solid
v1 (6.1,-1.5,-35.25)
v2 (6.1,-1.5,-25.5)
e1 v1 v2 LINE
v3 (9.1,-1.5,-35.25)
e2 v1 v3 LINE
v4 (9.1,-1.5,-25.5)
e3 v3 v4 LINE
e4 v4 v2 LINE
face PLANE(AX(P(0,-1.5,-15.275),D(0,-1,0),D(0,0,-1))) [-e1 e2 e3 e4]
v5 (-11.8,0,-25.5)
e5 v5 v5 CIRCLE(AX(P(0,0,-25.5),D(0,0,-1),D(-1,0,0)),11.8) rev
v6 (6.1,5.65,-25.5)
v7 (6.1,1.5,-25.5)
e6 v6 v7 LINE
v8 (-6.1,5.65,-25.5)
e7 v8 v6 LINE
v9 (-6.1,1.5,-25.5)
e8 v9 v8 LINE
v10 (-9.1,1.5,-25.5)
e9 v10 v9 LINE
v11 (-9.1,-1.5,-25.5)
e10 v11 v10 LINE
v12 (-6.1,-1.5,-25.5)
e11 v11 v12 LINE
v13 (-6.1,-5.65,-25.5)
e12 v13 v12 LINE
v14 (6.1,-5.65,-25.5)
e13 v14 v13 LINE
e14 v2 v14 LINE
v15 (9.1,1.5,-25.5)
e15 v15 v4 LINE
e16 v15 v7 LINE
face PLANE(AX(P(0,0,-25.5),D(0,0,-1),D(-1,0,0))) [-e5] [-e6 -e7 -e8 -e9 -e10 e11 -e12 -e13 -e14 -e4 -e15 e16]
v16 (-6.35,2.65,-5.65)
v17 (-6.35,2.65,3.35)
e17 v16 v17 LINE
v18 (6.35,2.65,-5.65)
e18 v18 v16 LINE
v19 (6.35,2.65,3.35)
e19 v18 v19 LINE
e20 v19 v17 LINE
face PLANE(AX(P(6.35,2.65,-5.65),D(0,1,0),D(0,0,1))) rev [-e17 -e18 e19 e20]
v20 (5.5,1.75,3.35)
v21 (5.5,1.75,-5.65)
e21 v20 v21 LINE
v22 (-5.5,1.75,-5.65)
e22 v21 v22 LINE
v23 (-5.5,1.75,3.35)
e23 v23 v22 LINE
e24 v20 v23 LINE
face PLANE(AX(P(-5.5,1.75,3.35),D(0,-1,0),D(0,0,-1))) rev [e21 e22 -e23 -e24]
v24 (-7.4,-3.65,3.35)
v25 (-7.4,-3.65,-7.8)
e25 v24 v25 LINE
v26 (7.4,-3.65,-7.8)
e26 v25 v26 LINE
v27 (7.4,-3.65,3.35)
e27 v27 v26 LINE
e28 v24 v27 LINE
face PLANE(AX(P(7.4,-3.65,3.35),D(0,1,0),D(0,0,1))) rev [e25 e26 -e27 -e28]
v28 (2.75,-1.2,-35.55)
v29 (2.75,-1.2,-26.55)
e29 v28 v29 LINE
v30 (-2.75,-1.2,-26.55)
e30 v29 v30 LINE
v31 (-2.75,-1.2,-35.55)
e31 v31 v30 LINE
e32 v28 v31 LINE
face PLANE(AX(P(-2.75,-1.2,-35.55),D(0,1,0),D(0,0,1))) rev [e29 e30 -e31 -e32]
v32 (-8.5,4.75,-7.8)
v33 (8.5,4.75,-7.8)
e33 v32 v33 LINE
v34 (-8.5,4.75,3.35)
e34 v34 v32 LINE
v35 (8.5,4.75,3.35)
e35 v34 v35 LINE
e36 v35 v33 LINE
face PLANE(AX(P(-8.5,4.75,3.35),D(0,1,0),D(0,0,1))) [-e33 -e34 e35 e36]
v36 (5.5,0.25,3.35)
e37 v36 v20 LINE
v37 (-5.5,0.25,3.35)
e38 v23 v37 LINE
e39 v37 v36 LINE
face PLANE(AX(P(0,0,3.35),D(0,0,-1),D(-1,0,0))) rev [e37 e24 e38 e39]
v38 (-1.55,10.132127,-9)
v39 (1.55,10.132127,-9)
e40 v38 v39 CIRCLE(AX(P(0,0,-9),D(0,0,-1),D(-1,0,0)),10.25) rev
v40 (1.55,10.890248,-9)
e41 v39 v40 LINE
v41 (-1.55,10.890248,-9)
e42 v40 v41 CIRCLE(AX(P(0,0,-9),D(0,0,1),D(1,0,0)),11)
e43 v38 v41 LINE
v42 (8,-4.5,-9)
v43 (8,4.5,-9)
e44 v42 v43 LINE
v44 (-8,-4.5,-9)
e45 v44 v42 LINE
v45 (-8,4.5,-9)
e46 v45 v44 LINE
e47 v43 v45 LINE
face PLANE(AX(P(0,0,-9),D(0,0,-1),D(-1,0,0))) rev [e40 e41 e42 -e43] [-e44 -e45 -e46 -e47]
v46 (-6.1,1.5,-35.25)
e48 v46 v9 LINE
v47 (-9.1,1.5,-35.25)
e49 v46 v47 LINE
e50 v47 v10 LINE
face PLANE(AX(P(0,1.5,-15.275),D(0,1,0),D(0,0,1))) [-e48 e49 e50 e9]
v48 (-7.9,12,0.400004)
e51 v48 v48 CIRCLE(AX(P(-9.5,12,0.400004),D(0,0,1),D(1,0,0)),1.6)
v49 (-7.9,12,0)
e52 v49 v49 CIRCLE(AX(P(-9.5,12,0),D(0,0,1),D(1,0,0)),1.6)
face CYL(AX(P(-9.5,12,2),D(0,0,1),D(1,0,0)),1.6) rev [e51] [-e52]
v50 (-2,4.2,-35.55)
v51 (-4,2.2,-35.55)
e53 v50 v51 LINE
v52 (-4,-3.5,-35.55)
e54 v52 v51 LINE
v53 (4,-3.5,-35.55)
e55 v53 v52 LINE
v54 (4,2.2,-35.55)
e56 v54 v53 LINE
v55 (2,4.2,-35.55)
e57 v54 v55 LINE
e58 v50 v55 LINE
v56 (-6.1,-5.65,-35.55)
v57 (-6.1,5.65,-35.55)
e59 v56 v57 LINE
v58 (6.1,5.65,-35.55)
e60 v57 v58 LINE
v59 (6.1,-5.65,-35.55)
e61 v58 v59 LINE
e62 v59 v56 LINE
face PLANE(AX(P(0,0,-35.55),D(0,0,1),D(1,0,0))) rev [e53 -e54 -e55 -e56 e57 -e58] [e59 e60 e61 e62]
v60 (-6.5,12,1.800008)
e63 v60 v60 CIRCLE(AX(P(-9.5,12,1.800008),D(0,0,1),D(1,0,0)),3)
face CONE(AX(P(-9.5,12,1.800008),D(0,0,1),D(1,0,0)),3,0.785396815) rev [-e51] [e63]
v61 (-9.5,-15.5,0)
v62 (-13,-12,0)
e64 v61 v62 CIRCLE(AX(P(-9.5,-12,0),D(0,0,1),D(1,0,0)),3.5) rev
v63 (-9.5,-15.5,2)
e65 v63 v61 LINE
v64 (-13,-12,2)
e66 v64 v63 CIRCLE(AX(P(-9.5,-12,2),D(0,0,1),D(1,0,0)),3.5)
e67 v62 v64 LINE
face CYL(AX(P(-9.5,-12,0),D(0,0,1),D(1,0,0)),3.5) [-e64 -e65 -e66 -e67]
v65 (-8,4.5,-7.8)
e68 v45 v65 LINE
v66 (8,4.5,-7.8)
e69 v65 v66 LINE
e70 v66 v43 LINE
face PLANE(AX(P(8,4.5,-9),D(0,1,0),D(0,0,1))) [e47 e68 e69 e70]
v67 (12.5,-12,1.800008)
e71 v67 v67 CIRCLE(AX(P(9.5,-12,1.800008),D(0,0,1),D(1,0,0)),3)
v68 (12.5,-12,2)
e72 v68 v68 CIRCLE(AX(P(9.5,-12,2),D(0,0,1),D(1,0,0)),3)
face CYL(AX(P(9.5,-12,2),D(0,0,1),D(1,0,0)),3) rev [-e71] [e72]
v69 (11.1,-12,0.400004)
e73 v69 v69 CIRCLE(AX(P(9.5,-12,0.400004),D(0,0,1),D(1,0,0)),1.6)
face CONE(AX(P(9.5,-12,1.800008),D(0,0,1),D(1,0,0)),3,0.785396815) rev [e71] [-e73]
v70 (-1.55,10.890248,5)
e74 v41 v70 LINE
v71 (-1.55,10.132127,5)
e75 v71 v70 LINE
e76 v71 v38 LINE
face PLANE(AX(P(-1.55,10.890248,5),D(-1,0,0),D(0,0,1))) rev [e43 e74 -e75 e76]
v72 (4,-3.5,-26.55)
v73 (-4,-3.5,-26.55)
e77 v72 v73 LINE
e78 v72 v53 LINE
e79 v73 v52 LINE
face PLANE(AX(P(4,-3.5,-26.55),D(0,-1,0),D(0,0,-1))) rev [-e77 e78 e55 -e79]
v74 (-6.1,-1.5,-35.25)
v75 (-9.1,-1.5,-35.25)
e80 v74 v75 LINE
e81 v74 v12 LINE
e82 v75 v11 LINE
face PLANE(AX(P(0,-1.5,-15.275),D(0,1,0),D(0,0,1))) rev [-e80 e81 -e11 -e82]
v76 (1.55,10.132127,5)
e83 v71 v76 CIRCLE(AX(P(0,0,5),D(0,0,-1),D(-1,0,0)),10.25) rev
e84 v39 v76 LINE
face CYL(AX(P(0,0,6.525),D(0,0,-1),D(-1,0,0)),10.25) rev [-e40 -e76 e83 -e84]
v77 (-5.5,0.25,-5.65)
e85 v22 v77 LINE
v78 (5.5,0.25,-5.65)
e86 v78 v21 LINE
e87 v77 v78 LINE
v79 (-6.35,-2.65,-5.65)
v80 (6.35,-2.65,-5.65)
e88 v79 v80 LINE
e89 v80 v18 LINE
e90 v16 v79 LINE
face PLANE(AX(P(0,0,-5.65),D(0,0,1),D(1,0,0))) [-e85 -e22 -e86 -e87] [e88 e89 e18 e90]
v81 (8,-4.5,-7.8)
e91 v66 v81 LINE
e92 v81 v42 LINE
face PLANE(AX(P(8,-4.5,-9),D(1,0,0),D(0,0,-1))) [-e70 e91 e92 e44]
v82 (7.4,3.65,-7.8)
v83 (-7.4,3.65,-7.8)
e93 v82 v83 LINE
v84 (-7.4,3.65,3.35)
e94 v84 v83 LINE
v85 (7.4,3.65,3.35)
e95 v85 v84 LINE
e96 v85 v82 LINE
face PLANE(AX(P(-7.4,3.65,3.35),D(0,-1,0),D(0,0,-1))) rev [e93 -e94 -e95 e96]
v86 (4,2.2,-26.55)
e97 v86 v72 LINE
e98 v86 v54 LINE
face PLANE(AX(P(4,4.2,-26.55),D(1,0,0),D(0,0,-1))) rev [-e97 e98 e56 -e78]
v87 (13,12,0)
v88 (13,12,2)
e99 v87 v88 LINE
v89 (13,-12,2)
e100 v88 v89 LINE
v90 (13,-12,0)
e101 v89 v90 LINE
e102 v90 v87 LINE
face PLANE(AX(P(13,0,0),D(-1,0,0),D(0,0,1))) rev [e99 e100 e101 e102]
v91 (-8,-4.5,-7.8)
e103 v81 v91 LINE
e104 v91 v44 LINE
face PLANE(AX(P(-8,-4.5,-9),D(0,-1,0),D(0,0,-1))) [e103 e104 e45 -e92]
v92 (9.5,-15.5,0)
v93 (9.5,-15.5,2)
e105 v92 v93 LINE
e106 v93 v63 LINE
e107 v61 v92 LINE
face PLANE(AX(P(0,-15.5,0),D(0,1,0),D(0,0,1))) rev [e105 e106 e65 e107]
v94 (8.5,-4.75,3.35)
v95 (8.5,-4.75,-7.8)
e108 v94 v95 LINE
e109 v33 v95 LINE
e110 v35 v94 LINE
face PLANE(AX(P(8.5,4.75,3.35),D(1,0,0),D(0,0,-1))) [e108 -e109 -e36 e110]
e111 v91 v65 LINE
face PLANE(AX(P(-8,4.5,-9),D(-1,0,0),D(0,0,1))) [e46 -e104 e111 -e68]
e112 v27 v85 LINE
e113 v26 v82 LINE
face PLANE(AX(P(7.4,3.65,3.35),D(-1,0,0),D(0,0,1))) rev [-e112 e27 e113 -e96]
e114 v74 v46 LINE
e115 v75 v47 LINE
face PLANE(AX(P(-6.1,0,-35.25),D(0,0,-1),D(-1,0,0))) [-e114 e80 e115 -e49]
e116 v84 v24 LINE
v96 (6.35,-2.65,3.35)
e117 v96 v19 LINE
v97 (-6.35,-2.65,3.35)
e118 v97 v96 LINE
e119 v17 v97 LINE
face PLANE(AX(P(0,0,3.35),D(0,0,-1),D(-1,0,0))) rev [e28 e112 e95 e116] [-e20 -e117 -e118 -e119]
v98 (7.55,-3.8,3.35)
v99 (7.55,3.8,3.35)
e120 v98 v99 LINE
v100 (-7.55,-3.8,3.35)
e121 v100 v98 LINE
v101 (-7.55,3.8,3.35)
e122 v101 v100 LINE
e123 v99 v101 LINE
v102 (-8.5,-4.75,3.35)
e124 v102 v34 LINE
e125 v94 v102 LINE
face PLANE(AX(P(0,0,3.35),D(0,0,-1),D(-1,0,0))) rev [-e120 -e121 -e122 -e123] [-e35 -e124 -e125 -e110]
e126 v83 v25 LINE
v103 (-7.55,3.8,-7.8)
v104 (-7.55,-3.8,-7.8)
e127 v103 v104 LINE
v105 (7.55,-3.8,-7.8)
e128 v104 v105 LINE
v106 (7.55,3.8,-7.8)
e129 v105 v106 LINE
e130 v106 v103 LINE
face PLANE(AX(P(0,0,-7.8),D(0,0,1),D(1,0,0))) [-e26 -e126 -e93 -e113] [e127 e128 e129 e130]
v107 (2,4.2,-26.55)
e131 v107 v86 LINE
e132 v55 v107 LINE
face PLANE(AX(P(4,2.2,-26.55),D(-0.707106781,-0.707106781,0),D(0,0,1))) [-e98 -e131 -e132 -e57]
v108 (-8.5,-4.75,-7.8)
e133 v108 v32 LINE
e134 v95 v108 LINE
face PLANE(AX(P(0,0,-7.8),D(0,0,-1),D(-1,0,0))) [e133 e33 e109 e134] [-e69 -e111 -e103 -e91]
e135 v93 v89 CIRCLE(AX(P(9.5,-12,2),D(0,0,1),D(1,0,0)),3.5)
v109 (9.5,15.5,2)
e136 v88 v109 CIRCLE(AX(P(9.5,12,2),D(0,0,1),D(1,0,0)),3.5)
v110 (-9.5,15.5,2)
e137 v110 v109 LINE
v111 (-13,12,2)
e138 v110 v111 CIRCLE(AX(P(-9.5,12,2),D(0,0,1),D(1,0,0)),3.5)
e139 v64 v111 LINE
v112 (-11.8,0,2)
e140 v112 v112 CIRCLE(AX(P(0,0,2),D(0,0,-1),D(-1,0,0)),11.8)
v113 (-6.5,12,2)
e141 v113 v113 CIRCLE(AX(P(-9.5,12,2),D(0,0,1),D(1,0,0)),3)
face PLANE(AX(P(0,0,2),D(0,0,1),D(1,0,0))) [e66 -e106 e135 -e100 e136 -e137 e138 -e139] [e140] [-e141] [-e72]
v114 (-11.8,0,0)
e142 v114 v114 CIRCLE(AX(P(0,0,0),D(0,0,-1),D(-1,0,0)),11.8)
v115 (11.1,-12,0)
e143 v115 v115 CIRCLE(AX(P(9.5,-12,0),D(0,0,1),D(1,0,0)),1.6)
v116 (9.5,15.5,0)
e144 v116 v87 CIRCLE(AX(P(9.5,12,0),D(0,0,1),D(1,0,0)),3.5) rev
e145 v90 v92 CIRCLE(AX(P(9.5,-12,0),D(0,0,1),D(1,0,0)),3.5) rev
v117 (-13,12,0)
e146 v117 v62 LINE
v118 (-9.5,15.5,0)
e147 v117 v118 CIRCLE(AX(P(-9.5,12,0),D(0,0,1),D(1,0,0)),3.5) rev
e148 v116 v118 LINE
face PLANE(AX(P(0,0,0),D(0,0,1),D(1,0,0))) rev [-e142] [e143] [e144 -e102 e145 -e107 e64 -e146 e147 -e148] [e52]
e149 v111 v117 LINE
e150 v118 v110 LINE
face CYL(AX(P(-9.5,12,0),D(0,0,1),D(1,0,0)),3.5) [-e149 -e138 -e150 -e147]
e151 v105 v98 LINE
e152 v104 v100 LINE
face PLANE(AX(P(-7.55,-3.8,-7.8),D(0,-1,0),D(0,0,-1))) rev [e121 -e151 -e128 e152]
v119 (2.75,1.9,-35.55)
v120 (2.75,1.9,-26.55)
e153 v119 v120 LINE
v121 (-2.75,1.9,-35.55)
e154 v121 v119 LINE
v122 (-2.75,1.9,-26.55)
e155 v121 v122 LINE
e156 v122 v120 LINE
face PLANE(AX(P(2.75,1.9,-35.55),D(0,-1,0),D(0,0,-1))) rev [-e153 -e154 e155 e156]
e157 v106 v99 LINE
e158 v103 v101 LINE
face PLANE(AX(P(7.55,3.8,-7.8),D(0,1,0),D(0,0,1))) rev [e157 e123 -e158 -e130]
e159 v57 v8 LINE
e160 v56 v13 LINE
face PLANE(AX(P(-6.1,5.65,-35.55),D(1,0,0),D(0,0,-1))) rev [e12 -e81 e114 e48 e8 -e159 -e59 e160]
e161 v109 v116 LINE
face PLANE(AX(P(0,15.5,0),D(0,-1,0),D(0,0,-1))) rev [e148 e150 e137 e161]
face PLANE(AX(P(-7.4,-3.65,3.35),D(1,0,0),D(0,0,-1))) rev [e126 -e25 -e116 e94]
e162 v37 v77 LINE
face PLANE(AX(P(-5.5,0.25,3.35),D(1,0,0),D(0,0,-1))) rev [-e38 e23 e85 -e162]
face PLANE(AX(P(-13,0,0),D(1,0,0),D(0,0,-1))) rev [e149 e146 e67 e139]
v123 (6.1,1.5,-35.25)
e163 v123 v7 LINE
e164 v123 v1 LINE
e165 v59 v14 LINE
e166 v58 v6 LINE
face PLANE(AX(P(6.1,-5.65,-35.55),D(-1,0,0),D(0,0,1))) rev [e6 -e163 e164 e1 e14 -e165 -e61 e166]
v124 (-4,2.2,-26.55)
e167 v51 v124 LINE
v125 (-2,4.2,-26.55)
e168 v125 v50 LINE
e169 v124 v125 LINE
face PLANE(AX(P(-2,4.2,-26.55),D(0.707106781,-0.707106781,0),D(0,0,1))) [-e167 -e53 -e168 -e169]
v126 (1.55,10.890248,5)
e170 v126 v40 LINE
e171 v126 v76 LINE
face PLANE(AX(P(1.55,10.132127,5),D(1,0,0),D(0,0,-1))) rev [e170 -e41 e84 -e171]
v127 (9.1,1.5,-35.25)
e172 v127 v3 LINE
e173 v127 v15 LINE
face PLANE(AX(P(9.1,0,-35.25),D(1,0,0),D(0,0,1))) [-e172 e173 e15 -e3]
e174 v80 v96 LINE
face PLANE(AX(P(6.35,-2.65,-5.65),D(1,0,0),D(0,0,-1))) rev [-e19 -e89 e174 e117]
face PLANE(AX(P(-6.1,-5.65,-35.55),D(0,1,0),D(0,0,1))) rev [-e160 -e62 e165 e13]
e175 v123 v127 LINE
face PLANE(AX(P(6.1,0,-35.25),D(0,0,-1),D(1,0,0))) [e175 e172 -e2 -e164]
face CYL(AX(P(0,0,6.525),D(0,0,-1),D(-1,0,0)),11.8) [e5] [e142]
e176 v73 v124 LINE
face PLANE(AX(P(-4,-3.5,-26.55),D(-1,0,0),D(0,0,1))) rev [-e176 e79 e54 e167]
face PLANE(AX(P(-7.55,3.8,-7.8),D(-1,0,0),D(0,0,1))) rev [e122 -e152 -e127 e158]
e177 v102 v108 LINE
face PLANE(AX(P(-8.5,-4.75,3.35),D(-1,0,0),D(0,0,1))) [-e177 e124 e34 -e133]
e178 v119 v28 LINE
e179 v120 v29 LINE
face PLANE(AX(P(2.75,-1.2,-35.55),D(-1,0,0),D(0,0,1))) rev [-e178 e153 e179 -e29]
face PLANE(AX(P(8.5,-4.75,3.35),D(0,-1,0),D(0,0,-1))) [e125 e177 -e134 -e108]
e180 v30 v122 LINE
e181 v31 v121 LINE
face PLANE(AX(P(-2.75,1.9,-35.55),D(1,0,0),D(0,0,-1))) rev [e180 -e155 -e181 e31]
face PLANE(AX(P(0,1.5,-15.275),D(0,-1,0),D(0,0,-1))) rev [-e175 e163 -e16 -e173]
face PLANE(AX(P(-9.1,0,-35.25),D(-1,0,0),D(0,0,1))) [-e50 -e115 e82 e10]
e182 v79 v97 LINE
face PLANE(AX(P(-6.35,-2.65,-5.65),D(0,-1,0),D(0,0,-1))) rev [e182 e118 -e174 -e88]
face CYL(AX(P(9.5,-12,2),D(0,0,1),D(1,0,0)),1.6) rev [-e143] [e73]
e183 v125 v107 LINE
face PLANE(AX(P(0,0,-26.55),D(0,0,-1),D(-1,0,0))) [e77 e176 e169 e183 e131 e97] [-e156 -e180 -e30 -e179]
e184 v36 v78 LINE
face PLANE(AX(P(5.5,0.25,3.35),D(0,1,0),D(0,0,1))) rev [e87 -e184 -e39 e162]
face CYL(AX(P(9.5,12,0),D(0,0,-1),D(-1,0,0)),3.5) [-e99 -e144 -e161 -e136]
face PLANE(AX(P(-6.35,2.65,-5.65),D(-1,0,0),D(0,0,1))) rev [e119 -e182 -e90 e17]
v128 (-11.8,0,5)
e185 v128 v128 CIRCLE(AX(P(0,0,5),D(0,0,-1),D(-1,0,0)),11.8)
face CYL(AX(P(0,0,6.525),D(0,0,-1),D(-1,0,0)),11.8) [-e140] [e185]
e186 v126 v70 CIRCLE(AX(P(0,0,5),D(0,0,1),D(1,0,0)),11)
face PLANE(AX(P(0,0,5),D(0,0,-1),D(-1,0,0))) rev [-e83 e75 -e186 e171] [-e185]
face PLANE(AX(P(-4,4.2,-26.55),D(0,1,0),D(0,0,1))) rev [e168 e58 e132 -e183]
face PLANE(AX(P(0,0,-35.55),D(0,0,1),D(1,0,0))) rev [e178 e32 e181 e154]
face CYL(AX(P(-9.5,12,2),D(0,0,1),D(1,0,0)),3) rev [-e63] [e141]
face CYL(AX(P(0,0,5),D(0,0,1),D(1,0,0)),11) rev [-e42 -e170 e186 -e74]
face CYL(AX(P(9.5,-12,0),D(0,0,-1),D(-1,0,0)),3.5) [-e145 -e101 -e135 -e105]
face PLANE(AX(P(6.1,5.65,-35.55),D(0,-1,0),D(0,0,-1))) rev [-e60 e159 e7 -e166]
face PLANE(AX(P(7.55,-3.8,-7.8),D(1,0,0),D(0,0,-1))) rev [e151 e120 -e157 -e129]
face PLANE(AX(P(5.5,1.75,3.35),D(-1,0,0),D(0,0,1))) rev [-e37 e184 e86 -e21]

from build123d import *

# Parameters (mm, degrees)
BOSS_EXTRU_1_START                          = -25.5
BOSS_EXTRU_1_OUTLINE_R                      = 11.8
BOSS_EXTRU_1_DEPTH                          = 16.5
BOSS_EXTRU_1_START_2                        = -9
BOSS_EXTRU_1_2_DEPTH                        = 14
BOSS_EXTRU_1_3_DEPTH                        = 2
BOSS_EXTRU_1_4_OUTLINE_W                    = 16
BOSS_EXTRU_1_4_OUTLINE_H                    = 9
BOSS_EXTRU_1_4_DEPTH                        = 1.2
BOSS_EXTRU_1_START_3                        = -7.8
BOSS_EXTRU_1_5_DEPTH                        = 7.8
BOSS_EXTRU_1_START_4                        = 2
BOSS_EXTRU_1_6_DEPTH                        = 3
ESQUISSE2_W                                 = 17
ESQUISSE2_H                                 = 9.5
BOSS_EXTRU_2_DEPTH                          = 11.15
ESQUISSE3_W                                 = 2
ESQUISSE3_H                                 = 27.3
BOSS_EXTRU_3_DEPTH                          = 1.236375462
ESQUISSE4_W                                 = 2
ESQUISSE4_H                                 = 27.3
BOSS_EXTRU_4_DEPTH                          = 1.2
ESQUISSE5_W                                 = 26
ESQUISSE5_H                                 = 2
BOSS_EXTRU_5_DEPTH                          = 3.7
ESQUISSE6_W                                 = 15.1
ESQUISSE6_H                                 = 7.6
ENL_V_MAT_EXTRU_1_DEPTH                     = 11.15
ESQUISSE7_W                                 = 14.8
ESQUISSE7_H                                 = 7.3
BOSS_EXTRU_6_DEPTH                          = 11.15
ESQUISSE8_W                                 = 12.7
ESQUISSE8_H                                 = 5.3
ENL_V_MAT_EXTRU_2_DEPTH                     = 9
ESQUISSE9_W                                 = 11
ESQUISSE9_H                                 = 1.5
BOSS_EXTRU_7_DEPTH                          = 9
ESQUISSE10_W                                = 12.2
ESQUISSE10_H                                = 11.3
BOSS_EXTRU_8_DEPTH                          = 10.05
ESQUISSE11_W                                = 8
ESQUISSE11_H                                = 7.7
ENL_V_MAT_EXTRU_3_DEPTH                     = 9
ESQUISSE12_W                                = 5.5
ESQUISSE12_H                                = 3.1
BOSS_EXTRU_9_DEPTH                          = 9
FRAISAGE_POUR_VIS_T_TE_FRAIS_E_M31_AT_COUNT = 2
FRAISAGE_POUR_VIS_T_TE_FRAIS_E_M31_AT_PITCH = 30.61045573
NERVURE1_START                              = -1.5
NERVURE1_OUTLINE_W                          = 3
NERVURE1_OUTLINE_H                          = 9.75
NERVURE1_DEPTH                              = 3
NERVURE2_START                              = -1.5
NERVURE2_OUTLINE_W                          = 3
NERVURE2_OUTLINE_H                          = 9.75
NERVURE2_DEPTH                              = 3
CHANFREIN1_SIZE                             = 2
CONG_4_R                                    = 3.5


with BuildPart() as part:
    # Boss.-Extru.1: read off the stored shape, not the designer's step
    # Boss.-Extru.1 outline → Boss.-Extru.1 (new body)
    with BuildSketch(Plane.XY.offset(BOSS_EXTRU_1_START)):
        Circle(BOSS_EXTRU_1_OUTLINE_R)
    extrude(amount=BOSS_EXTRU_1_DEPTH)

    # Boss.-Extru.1 2 outline → Boss.-Extru.1 2 (add)
    with BuildSketch(Plane.XY.offset(BOSS_EXTRU_1_START_2)):
        with BuildLine():
            ThreePointArc((11.763624538, 0.92581733), (-11.8, 0), (11.763624538, -0.92581733))
            Line((11.763624538, -0.92581733), (11.763624538, 0.92581733))
        make_face()
        with BuildLine():
            Line((-1.55, 10.132127121), (-1.55, 10.890247931))
            ThreePointArc((-1.55, 10.890247931), (0, 11), (1.55, 10.890247931))
            Line((1.55, 10.890247931), (1.55, 10.132127121))
            ThreePointArc((1.55, 10.132127121), (0, -10.25), (-1.55, 10.132127121))
        make_face(mode=Mode.SUBTRACT)
    extrude(amount=BOSS_EXTRU_1_2_DEPTH)

    # Boss.-Extru.1 3 outline → Boss.-Extru.1 3 (add)
    with BuildSketch(Plane.XY):
        with BuildLine():
            Line((2.9e-08, 11.8), (-11.8, 11.8))
            Line((-11.8, 11.8), (-11.8, 0))
            ThreePointArc((-11.8, 0), (-8.343860008, 8.343860028), (2.9e-08, 11.8))
        make_face()
        with BuildLine():
            ThreePointArc((11.763624538, -0.92581733), (-0.463265826, -11.790902628), (-11.8, 0))
            Line((-11.8, 0), (-11.8, -15.5))
            Line((-11.8, -15.5), (11.763624538, -15.5))
            Line((11.763624538, -15.5), (11.763624538, -0.92581733))
        make_face()
        with BuildLine():
            Line((11.763624538, 11.8), (2.9e-08, 11.8))
            ThreePointArc((2.9e-08, 11.8), (8.009848808, 8.665005602), (11.763624538, 0.92581733))
            Line((11.763624538, 0.92581733), (11.763624538, 11.8))
        make_face()
    extrude(amount=BOSS_EXTRU_1_3_DEPTH)

    # Boss.-Extru.1 4 outline → Boss.-Extru.1 4 (add)
    with BuildSketch(Plane.XY.offset(BOSS_EXTRU_1_START_2)):
        with BuildLine():
            Line((11.763624538, 0.92581733), (11.763624538, -0.92581733))
            ThreePointArc((11.763624538, -0.92581733), (11.8, 0), (11.763624538, 0.92581733))
        make_face()
        Rectangle(BOSS_EXTRU_1_4_OUTLINE_W, BOSS_EXTRU_1_4_OUTLINE_H)
    extrude(amount=BOSS_EXTRU_1_4_DEPTH)

    # Boss.-Extru.1 5 outline → Boss.-Extru.1 5 (add)
    with BuildSketch(Plane.XY.offset(BOSS_EXTRU_1_START_3)):
        with BuildLine():
            Line((11.763624538, 0.92581733), (11.763624538, -0.92581733))
            ThreePointArc((11.763624538, -0.92581733), (11.8, 0), (11.763624538, 0.92581733))
        make_face()
    extrude(amount=BOSS_EXTRU_1_5_DEPTH)

    # Boss.-Extru.1 6 outline → Boss.-Extru.1 6 (add)
    with BuildSketch(Plane.XY.offset(BOSS_EXTRU_1_START_4)):
        with BuildLine():
            Line((11.763624538, 0.92581733), (11.763624538, -0.92581733))
            ThreePointArc((11.763624538, -0.92581733), (11.8, 0), (11.763624538, 0.92581733))
        make_face()
    extrude(amount=BOSS_EXTRU_1_6_DEPTH)

    # Esquisse2 → Boss.-Extru.2 (add)
    with BuildSketch(Plane(origin=(0, 0, -7.8), x_dir=(-1, 0, 0), z_dir=(0, 0, -1))):
        Rectangle(ESQUISSE2_W, ESQUISSE2_H)
    extrude(amount=-BOSS_EXTRU_2_DEPTH)

    # Esquisse3 → Boss.-Extru.3 (add)
    with BuildSketch(Plane(origin=(11.763624538, 0, 0), x_dir=(0, 0, -1), z_dir=(1, 0, 0))):
        with Locations((-1, -1.85)):
            Rectangle(ESQUISSE3_W, ESQUISSE3_H)
    extrude(amount=BOSS_EXTRU_3_DEPTH)

    # Esquisse4 → Boss.-Extru.4 (add)
    with BuildSketch(Plane.ZY.offset(11.8)):
        with Locations((1, -1.85)):
            Rectangle(ESQUISSE4_W, ESQUISSE4_H)
    extrude(amount=BOSS_EXTRU_4_DEPTH)

    # Esquisse5 → Boss.-Extru.5 (add)
    with BuildSketch(Plane(origin=(0, 11.8, 0), x_dir=(-1, 0, 0), z_dir=(0, 1, 0))):
        with Locations((0, 1)):
            Rectangle(ESQUISSE5_W, ESQUISSE5_H)
    extrude(amount=BOSS_EXTRU_5_DEPTH)

    # Esquisse6 → Enlèv. mat.-Extru.1 (cut)
    with BuildSketch(Plane.XY.offset(3.35)):
        Rectangle(ESQUISSE6_W, ESQUISSE6_H)
    extrude(amount=-ENL_V_MAT_EXTRU_1_DEPTH, mode=Mode.SUBTRACT)

    # Esquisse7 → Boss.-Extru.6 (add)
    with BuildSketch(Plane.XY.offset(-7.8)):
        Rectangle(ESQUISSE7_W, ESQUISSE7_H)
    extrude(amount=BOSS_EXTRU_6_DEPTH)

    # Esquisse8 → Enlèv. mat.-Extru.2 (cut)
    with BuildSketch(Plane.XY.offset(3.35)):
        Rectangle(ESQUISSE8_W, ESQUISSE8_H)
    extrude(amount=-ENL_V_MAT_EXTRU_2_DEPTH, mode=Mode.SUBTRACT)

    # Esquisse9 → Boss.-Extru.7 (add)
    with BuildSketch(Plane.XY.offset(-5.65)):
        with Locations((0, 1)):
            Rectangle(ESQUISSE9_W, ESQUISSE9_H)
    extrude(amount=BOSS_EXTRU_7_DEPTH)

    # Esquisse10 → Boss.-Extru.8 (add)
    with BuildSketch(Plane(origin=(0, 0, -25.5), x_dir=(-1, 0, 0), z_dir=(0, 0, -1))):
        Rectangle(ESQUISSE10_W, ESQUISSE10_H)
    extrude(amount=BOSS_EXTRU_8_DEPTH)

    # Esquisse11 → Enlèv. mat.-Extru.3 (cut)
    with BuildSketch(Plane(origin=(0, 0, -35.55), x_dir=(-1, 0, 0), z_dir=(0, 0, -1))):
        with Locations((0, 0.35)):
            Rectangle(ESQUISSE11_W, ESQUISSE11_H)
    extrude(amount=-ENL_V_MAT_EXTRU_3_DEPTH, mode=Mode.SUBTRACT)

    # Esquisse12 → Boss.-Extru.9 (add)
    with BuildSketch(Plane(origin=(0, 0, -26.55), x_dir=(-1, 0, 0), z_dir=(0, 0, -1))):
        with Locations((0, 0.35)):
            Rectangle(ESQUISSE12_W, ESQUISSE12_H)
    extrude(amount=BOSS_EXTRU_9_DEPTH)

    # Esquisse13 → Fraisage pour vis à tête fraisée M31 (revolve, cut)
    with BuildSketch(Plane(origin=(-9.5, 12, 2), x_dir=(0, -1, 0), z_dir=(1, 0, 0))):
        Polygon((0, 0), (0, 37.55), (1.6, 37.55), (1.6, 1.599995685), (3, 0.19999191), (3, 0), align=None)
    fraisage_pour_vis_t_te_frais_e_m31 = revolve(axis=Axis((-9.5, 12, 8.35), (0, 0, -1)), mode=Mode.SUBTRACT)

    # Fraisage pour vis à tête fraisée M31 at: Fraisage pour vis à tête fraisée M31 ×2
    with Locations(*[Vector(0.6207029443655612, -0.7840458244617614, 0) * (i * FRAISAGE_POUR_VIS_T_TE_FRAIS_E_M31_AT_PITCH) for i in range(1, FRAISAGE_POUR_VIS_T_TE_FRAIS_E_M31_AT_COUNT)]):
        add(fraisage_pour_vis_t_te_frais_e_m31, mode=Mode.SUBTRACT)

    # Nervure1: read off the stored shape, not the designer's step
    # Nervure1 outline → Nervure1 (add)
    with BuildSketch(Plane.XZ.offset(NERVURE1_START)):
        with Locations((7.6, -30.375)):
            Rectangle(NERVURE1_OUTLINE_W, NERVURE1_OUTLINE_H)
    extrude(amount=NERVURE1_DEPTH)

    # Nervure2: read off the stored shape, not the designer's step
    # Nervure2 outline → Nervure2 (add)
    with BuildSketch(Plane(origin=(0, 0, 0), x_dir=(1, 0, 0), z_dir=(0, 1, 0)).offset(NERVURE2_START)):
        with Locations((-7.6, 30.375)):
            Rectangle(NERVURE2_OUTLINE_W, NERVURE2_OUTLINE_H)
    extrude(amount=NERVURE2_DEPTH)

    # Chanfrein1
    chanfrein1_edges = [part.edges().sort_by_distance(p)[0] for p in [
        (-4, 4.2, -31.05),
        (4, 4.2, -31.05),
    ]]
    chamfer(chanfrein1_edges, length=CHANFREIN1_SIZE)

    # Congé4
    cong_4_edges = [part.edges().sort_by_distance(p)[0] for p in [
        (13, -15.5, 1),
        (-13, -15.5, 1),
        (13, 15.5, 1),
        (-13, 15.5, 1),
    ]]
    fillet(cong_4_edges, radius=CONG_4_R)


solid = part.part
